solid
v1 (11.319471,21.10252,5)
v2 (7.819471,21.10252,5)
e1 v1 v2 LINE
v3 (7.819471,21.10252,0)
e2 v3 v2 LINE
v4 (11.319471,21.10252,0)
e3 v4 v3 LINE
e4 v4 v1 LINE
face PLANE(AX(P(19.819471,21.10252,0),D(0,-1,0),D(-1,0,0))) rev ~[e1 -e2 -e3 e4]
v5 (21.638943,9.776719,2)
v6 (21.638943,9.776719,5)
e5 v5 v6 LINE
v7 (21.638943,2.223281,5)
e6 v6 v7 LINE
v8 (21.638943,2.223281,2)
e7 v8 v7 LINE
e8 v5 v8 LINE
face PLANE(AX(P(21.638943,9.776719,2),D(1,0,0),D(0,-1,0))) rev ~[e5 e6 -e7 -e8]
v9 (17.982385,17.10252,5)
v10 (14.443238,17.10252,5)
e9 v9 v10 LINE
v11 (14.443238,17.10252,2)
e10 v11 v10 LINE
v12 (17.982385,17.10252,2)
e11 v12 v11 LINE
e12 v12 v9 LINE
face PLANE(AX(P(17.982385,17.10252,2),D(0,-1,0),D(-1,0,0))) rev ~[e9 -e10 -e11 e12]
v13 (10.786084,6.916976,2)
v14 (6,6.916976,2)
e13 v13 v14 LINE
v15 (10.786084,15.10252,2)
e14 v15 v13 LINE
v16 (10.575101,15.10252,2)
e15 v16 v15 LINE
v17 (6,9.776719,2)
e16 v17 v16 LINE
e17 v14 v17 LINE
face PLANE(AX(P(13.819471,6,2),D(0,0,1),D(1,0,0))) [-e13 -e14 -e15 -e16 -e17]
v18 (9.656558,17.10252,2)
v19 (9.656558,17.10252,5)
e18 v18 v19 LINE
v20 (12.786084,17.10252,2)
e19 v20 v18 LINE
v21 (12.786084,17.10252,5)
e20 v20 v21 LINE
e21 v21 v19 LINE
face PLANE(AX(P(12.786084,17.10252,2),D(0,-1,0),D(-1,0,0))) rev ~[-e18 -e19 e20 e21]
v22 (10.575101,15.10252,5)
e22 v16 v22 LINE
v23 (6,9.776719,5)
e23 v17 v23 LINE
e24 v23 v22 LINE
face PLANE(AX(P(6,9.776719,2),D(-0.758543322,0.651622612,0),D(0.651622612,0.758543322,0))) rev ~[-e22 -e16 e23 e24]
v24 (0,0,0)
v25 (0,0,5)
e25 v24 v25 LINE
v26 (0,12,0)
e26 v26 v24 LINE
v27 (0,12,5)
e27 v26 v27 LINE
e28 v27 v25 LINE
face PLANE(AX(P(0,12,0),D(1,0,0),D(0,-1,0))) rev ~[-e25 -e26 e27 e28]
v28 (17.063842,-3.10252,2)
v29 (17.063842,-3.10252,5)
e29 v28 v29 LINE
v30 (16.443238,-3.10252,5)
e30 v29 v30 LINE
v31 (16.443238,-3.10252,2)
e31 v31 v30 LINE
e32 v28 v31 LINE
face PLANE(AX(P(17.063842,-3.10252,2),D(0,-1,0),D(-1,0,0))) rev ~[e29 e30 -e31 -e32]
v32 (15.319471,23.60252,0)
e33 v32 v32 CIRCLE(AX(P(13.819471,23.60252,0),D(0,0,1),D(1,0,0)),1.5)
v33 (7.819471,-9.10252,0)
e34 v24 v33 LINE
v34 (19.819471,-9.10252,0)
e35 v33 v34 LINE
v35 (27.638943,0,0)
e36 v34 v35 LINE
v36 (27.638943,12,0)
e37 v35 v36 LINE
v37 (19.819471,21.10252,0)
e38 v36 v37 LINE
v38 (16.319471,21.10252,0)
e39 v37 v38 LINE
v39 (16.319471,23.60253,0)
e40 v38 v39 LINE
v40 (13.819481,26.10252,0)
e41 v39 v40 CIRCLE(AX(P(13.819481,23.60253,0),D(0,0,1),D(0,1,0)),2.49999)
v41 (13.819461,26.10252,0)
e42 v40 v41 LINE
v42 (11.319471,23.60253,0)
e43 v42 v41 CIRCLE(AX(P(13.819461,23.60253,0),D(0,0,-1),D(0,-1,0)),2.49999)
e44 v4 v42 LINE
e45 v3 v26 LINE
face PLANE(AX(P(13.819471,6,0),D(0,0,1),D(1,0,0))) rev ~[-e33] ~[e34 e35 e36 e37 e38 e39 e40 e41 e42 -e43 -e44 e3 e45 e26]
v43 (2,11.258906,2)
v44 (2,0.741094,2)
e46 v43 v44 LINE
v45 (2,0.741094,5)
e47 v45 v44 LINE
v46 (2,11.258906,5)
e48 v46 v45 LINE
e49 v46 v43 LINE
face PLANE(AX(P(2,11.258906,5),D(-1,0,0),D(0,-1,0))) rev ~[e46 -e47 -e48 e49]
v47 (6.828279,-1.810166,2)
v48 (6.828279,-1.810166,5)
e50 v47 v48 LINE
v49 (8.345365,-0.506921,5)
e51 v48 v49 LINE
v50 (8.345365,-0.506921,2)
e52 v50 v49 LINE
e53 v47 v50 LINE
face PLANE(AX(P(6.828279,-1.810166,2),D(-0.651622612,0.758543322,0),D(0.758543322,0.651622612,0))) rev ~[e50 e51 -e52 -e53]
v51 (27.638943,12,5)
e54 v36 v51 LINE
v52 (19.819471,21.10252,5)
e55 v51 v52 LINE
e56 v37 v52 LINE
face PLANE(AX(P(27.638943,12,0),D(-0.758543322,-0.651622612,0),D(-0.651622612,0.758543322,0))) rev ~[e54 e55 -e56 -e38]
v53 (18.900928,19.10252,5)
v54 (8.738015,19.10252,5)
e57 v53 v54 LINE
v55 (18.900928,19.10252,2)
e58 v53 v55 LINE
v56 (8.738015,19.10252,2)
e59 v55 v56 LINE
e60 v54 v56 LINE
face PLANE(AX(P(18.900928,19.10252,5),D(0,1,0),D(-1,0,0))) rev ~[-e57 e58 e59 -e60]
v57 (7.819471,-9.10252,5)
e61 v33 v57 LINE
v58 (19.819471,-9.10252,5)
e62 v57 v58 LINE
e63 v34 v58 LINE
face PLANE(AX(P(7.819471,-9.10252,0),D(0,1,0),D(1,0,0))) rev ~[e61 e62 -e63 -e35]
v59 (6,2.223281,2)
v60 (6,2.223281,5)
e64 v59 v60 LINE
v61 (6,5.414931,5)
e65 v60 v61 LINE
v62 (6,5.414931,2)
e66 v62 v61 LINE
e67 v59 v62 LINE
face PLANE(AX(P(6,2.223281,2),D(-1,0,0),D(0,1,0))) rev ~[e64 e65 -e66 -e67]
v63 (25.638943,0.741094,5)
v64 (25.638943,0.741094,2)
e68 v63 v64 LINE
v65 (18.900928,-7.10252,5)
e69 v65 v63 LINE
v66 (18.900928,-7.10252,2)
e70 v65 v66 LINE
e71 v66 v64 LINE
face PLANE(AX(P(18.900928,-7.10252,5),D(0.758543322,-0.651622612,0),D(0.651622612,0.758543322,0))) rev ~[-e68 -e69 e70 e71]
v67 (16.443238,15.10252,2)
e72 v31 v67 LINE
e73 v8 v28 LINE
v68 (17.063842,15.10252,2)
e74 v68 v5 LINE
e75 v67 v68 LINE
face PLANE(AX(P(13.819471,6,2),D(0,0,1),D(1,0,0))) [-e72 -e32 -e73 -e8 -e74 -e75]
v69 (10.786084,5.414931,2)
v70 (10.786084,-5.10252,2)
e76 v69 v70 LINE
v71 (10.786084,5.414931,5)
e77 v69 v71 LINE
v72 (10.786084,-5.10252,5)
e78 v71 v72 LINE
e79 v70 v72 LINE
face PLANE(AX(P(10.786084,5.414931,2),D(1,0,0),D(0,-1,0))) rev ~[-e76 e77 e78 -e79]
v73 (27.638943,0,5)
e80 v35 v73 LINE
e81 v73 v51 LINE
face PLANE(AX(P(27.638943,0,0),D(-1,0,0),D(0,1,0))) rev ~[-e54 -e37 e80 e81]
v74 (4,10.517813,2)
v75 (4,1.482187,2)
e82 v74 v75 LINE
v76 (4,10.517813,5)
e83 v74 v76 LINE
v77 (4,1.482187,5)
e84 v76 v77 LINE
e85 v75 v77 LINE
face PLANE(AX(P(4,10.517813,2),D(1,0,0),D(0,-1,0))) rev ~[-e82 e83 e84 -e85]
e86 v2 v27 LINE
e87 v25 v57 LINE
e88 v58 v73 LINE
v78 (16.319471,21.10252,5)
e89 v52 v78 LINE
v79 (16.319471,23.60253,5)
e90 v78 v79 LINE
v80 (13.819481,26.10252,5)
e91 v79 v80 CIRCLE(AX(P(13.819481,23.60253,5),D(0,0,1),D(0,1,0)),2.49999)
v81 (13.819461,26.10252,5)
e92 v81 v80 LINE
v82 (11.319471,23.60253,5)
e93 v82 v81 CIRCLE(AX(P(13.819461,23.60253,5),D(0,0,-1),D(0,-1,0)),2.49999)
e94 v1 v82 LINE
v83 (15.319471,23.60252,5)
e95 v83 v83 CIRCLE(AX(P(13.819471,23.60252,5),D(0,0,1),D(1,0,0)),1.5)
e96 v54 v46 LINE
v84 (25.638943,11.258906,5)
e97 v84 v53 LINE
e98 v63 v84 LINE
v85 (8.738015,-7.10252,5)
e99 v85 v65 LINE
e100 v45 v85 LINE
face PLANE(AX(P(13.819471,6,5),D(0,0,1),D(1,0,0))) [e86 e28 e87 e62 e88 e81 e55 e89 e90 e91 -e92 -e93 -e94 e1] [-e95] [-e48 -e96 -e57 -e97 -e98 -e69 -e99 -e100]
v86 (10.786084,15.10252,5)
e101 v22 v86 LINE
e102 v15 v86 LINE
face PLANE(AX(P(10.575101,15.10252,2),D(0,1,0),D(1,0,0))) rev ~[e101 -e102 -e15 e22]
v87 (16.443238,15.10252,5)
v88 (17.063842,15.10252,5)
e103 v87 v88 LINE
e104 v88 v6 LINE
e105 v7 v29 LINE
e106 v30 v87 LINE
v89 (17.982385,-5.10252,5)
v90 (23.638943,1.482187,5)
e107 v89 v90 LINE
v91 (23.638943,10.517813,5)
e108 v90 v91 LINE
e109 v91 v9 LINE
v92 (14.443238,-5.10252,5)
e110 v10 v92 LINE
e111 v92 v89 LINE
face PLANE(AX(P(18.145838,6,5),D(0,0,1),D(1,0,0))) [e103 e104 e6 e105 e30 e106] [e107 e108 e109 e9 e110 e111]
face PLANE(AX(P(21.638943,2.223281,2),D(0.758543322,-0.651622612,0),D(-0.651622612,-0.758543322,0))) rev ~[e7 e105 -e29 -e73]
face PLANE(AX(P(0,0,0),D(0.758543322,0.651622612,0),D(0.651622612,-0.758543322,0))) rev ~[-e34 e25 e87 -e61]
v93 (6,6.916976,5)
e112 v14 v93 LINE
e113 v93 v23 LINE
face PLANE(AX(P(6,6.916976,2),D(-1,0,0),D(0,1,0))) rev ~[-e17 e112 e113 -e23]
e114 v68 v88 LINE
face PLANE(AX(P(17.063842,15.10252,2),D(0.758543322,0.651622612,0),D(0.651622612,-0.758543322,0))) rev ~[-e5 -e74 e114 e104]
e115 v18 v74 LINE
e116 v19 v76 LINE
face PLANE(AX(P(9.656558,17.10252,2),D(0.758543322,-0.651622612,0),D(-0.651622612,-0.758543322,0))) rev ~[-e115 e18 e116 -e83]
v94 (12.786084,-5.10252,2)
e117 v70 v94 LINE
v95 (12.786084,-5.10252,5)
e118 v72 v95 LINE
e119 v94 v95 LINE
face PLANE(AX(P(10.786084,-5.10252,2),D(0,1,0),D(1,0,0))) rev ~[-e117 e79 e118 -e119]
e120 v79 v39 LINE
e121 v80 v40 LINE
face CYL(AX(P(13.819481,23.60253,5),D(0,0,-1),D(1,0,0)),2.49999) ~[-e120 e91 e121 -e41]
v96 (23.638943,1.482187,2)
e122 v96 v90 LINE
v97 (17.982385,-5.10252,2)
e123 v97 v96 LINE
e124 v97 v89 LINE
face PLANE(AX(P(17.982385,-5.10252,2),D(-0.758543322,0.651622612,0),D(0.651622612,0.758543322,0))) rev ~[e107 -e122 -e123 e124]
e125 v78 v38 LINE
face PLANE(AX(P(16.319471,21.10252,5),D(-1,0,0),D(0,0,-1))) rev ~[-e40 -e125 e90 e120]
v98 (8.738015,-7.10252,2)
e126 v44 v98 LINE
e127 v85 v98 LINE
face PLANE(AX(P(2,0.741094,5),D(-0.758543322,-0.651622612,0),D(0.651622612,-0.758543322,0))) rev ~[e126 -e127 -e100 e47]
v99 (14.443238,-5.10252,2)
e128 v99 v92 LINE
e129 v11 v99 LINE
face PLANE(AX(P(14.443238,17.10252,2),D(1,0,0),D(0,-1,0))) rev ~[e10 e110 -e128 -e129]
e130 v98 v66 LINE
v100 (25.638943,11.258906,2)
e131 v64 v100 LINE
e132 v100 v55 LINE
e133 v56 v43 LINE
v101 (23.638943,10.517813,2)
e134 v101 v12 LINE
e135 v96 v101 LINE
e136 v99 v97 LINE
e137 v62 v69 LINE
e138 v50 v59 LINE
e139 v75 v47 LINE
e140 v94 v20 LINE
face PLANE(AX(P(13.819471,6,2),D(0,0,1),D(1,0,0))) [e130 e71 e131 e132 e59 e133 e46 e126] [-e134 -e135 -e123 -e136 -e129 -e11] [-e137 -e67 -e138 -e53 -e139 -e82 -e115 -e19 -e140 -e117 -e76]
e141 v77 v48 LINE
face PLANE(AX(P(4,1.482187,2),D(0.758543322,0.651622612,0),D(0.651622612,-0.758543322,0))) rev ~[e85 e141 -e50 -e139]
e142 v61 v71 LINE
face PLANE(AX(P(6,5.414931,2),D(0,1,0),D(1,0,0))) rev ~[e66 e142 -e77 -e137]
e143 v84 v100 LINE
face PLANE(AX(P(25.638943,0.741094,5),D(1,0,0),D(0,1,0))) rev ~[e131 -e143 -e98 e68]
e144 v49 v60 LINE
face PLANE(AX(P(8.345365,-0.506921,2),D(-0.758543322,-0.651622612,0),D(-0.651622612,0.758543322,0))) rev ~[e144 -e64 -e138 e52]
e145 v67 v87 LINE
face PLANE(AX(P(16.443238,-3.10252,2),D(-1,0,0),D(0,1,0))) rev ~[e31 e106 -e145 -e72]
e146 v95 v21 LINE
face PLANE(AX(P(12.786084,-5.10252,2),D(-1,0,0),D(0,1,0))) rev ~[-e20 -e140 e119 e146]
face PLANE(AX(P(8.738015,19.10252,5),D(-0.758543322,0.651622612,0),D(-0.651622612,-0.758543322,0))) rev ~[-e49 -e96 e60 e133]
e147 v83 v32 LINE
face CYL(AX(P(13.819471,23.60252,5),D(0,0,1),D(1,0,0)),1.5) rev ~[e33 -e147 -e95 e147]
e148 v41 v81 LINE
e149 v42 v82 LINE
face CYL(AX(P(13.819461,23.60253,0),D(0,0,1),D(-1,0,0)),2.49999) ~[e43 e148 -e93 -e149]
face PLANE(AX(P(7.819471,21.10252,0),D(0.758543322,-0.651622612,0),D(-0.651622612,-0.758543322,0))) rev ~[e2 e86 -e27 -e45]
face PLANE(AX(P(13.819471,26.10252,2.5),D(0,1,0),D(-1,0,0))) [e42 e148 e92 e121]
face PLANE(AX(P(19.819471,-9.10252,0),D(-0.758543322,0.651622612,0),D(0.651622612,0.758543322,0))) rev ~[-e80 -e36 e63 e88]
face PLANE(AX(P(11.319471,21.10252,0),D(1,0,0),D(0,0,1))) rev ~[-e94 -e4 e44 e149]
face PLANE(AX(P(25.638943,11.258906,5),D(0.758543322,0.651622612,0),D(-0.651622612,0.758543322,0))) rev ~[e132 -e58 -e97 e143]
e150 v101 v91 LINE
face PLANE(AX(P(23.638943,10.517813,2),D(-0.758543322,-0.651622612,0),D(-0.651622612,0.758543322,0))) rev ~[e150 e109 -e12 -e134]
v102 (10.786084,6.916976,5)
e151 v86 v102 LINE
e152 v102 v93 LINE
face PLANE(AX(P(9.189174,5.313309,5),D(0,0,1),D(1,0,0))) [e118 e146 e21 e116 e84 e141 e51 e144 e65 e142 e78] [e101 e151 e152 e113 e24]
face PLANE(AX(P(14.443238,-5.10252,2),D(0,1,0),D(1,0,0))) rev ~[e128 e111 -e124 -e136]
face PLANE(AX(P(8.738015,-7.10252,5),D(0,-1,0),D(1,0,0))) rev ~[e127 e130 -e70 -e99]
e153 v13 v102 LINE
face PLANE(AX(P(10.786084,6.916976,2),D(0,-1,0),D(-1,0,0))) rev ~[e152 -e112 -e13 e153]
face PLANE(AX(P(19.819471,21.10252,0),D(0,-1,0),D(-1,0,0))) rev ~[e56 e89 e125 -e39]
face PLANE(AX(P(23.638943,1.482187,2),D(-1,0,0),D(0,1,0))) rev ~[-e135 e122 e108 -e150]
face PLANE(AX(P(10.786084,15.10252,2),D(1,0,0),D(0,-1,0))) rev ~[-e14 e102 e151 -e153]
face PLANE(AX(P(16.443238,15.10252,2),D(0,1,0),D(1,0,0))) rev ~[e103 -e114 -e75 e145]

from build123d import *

# Parameters (mm, degrees)
F1_DEPTH  = 5
F3_DEPTH  = 3
F5_DEPTH  = 3
F7_DEPTH  = 5
F8_R      = 2.49999
F9_R      = 1.5
F10_DEPTH = 5


# Not quite as in the source:
# - a fillet or chamfer is up to 0.001 mm smaller than in the source, because OpenCascade refuses the exact size


with BuildPart() as f1:
    # F0 (on Top) → F1 (new body)
    with BuildSketch(Plane.XY):
        Polygon((0, 6), (0, 0), (7.8194713464, -9.1025198634), (13.8194713464, -9.1025198634), (19.8194713464, -9.1025198634), (27.6389426928, 0), (27.6389426928, 6), (27.6389426928, 12), (19.8194713464, 21.1025198634), (13.8194713464, 21.1025198634), (7.8194713464, 21.1025198634), (0, 12), align=None)
    extrude(amount=F1_DEPTH)

    # F2 (on face) → F3 (cut)
    with BuildSketch(Plane.XY.offset(5)):
        Polygon((2, 11.2589063868), (2, 0.7410936132), (8.7380145007, -7.1025198634), (18.9009281921, -7.1025198634), (25.6389426928, 0.7410936132), (25.6389426928, 11.2589063868), (18.9009281921, 19.1025198634), (8.7380145007, 19.1025198634), align=None)
    extrude(amount=-F3_DEPTH, mode=Mode.SUBTRACT)

    # F4 (on face) → F5 (join)
    with BuildSketch(Plane.XY.offset(2)):
        Polygon((17.9823850378, -5.1025198634), (23.6389426928, 1.4821872264), (23.6389426928, 10.5178127736), (17.9823850378, 17.1025198634), (14.4432382658, 17.1025198634), (14.4432382658, -5.1025198634), align=None)
        Polygon((16.4432382658, -3.1025198634), (16.4432382658, 15.1025198634), (17.0638418835, 15.1025198634), (21.6389426928, 9.7767191605), (21.6389426928, 2.2232808395), (17.0638418835, -3.1025198634), align=None, mode=Mode.SUBTRACT)
        Polygon((10.7860844582, -3.1025198634), (10.7860844582, -5.1025198634), (12.7860844582, -5.1025198634), (12.7860844582, 17.1025198634), (9.6565576549, 17.1025198634), (4, 10.5178127736), (4, 1.4821872264), (6.8282788275, -1.8101663185), (8.3453654714, -0.5069210941), (6, 2.2232808395), (6, 5.4149306379), (10.7860844582, 5.4149306379), align=None)
        Polygon((6, 9.7767191605), (10.5751008092, 15.1025198634), (10.7860844582, 15.1025198634), (10.7860844582, 6.9169756025), (6, 6.9169756025), align=None, mode=Mode.SUBTRACT)
    extrude(amount=F5_DEPTH)

    # F6 (on face) → F7 (join)
    with BuildSketch(Plane(origin=(0, 21.1025198634, 0), x_dir=(-1, 0, 0), z_dir=(0, 1, 0))):
        Polygon((-11.3194713464, 5), (-13.8194713464, 5), (-16.3194713464, 5), (-16.3194713464, 0), (-11.3194713464, 0), align=None)
    extrude(amount=F7_DEPTH)

    # F8 (radius 2.5 in the source; OpenCascade refuses exactly that, so slightly less here)
    f8_edges = [f1.edges().sort_by_distance(p)[0] for p in [
        (11.319471, 26.10252, 2.5),
        (16.319471, 26.10252, 2.5),
    ]]
    fillet(f8_edges, radius=F8_R)

    # F9 (on face) → F10 (cut)
    with BuildSketch(Plane.XY.offset(5)):
        with Locations((13.8194713464, 23.6025198634)):
            Circle(F9_R)
    extrude(amount=-F10_DEPTH, mode=Mode.SUBTRACT)


solid = f1.part
